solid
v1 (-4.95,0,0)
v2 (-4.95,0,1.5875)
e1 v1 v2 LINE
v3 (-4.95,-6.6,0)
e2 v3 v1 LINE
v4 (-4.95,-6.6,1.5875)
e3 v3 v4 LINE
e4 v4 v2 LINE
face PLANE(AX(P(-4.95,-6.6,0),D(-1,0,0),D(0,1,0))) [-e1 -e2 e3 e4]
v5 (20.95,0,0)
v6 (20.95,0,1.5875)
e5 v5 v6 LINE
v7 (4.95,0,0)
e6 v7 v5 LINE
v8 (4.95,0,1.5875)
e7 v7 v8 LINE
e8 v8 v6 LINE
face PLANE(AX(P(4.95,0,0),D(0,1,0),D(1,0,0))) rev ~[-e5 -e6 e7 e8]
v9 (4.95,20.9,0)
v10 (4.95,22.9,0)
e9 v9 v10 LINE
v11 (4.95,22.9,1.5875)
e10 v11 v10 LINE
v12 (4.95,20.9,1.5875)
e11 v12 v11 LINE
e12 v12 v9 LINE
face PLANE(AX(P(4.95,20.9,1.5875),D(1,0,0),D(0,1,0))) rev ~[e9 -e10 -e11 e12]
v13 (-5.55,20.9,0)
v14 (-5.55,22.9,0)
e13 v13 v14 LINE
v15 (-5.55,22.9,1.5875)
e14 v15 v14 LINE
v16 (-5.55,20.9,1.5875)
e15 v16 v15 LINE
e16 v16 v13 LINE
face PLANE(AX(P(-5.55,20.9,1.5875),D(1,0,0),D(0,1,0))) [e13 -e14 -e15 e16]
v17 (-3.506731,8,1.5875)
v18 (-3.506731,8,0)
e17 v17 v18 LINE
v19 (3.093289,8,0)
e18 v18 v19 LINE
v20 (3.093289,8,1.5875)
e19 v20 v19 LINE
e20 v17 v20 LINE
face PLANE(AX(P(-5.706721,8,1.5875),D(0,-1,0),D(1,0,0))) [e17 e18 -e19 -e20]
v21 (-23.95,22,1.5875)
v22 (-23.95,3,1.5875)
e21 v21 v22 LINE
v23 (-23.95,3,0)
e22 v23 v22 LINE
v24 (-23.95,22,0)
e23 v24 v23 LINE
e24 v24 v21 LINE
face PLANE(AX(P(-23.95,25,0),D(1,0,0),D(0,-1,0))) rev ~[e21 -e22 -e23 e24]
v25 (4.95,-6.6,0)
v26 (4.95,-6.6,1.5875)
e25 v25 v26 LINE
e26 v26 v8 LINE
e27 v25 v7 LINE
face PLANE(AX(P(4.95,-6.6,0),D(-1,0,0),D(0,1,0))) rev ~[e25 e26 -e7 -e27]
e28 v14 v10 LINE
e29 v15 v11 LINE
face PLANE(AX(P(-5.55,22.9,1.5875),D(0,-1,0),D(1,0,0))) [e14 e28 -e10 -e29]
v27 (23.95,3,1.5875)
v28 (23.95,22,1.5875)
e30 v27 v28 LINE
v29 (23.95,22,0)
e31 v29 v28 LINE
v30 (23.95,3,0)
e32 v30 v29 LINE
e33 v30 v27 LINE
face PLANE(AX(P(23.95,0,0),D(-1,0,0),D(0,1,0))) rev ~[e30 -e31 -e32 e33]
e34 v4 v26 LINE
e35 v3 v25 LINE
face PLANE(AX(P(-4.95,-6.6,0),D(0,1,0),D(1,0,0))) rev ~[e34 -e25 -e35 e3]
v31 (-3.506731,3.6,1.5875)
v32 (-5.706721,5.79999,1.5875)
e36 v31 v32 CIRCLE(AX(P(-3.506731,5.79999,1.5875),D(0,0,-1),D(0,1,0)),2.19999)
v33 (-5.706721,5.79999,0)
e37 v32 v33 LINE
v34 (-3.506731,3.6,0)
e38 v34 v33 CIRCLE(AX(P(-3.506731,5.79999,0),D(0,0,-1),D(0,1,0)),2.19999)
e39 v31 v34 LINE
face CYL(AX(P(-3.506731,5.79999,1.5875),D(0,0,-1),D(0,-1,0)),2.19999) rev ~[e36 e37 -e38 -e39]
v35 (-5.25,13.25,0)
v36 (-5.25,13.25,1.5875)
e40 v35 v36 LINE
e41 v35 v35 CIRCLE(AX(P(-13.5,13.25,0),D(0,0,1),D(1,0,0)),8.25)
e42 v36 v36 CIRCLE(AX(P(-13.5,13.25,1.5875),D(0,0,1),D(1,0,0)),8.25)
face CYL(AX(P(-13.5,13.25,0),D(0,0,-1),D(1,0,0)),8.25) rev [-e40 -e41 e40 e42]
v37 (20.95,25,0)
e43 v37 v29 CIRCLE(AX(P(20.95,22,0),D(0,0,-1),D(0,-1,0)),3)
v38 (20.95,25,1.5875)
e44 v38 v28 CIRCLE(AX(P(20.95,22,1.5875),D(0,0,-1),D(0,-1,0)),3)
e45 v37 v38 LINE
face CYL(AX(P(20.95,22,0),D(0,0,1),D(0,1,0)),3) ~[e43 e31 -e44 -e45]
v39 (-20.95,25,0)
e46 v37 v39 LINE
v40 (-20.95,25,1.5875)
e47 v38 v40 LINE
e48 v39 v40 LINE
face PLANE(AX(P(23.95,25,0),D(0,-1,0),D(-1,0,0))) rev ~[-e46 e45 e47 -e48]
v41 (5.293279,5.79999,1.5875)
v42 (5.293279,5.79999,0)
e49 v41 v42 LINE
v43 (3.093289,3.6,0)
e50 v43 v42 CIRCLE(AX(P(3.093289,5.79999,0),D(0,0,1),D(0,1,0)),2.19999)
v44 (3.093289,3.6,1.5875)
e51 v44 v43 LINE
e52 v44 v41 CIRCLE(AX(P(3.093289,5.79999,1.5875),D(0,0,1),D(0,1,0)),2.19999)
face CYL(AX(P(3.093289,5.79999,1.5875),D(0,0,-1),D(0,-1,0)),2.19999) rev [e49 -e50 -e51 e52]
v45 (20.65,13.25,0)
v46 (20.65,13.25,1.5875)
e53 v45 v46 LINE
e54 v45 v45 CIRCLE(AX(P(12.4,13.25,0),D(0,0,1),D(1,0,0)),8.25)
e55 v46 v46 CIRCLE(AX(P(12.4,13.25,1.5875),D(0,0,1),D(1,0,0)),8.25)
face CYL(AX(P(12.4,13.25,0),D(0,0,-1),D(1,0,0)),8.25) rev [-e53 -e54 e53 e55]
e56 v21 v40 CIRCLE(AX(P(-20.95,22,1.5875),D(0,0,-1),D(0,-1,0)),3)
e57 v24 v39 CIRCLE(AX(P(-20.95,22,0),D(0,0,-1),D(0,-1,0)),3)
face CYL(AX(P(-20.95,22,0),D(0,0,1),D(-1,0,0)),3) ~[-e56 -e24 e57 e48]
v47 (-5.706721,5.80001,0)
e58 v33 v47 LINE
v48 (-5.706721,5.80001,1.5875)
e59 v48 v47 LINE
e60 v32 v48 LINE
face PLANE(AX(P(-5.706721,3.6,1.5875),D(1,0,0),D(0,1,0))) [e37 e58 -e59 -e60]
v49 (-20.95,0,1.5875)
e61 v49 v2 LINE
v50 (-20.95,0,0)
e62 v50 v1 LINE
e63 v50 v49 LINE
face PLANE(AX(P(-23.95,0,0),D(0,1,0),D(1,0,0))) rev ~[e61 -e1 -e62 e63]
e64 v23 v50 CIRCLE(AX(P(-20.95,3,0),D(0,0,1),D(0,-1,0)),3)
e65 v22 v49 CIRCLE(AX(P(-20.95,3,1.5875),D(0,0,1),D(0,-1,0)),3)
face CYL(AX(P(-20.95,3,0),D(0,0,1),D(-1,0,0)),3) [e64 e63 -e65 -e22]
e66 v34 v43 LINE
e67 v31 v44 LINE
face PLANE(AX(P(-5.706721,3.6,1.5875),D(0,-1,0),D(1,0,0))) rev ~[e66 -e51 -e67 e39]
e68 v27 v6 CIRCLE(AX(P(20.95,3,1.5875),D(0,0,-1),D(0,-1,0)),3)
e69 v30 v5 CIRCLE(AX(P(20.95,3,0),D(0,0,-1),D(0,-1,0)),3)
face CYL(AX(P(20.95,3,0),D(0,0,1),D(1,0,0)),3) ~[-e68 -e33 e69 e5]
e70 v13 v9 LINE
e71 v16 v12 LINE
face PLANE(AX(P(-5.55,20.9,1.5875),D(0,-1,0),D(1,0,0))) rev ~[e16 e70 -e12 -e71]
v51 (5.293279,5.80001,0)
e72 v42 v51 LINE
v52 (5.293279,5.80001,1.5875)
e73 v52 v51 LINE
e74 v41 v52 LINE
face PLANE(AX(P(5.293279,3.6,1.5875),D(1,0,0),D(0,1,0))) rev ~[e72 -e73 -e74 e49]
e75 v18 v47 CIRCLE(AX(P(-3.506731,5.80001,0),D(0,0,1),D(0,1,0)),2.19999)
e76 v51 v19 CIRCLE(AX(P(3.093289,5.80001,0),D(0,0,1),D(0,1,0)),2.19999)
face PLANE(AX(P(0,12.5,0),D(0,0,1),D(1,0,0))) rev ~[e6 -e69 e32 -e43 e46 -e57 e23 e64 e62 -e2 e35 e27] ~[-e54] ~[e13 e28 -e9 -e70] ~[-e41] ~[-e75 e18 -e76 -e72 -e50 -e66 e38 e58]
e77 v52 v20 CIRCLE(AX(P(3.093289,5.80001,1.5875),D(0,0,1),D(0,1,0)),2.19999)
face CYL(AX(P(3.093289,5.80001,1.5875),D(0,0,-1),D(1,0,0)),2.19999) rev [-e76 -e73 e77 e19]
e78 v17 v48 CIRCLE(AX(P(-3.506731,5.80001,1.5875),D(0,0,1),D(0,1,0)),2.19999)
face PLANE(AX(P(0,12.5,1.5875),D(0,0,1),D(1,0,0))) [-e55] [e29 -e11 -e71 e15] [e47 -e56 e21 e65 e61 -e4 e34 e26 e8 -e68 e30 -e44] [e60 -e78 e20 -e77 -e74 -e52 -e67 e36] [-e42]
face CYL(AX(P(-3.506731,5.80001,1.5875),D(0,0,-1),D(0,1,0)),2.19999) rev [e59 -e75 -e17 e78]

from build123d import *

# Parameters (mm, degrees)
F2_R     = 8.25
F2_W     = 9.9
F2_H     = 6.6
F3_DEPTH = 1.5875
F4_W     = 11
F4_H     = 4.4
F4_W_2   = 10.5
F4_H_2   = 2
F5_DEPTH = 1.5885
F6_R     = 3
F7_R     = 2.19999


# Not quite as in the source:
# - a fillet or chamfer is up to 0.001 mm smaller than in the source, because OpenCascade refuses the exact size


with BuildPart() as f3:
    # F2 (on Top) → F3 (new body)
    with BuildSketch(Plane.XY):
        Polygon((-23.95, 25), (-23.95, 0), (-4.95, 0), (4.95, 0), (23.95, 0), (23.95, 25), align=None)
        with Locations((-13.5, 13.25)):
            Circle(F2_R, mode=Mode.SUBTRACT)
        with Locations((12.4, 13.25)):
            Circle(F2_R, mode=Mode.SUBTRACT)
        with Locations((0, -3.3)):
            Rectangle(F2_W, F2_H)
    extrude(amount=F3_DEPTH)

    # F4 (on face) → F5 (cut, through all)
    with BuildSketch(Plane.XY.offset(1.5875)):
        with Locations((-0.2067205198, 5.8)):
            Rectangle(F4_W, F4_H)
        with Locations((-0.3, 21.9)):
            Rectangle(F4_W_2, F4_H_2)
    extrude(amount=-F5_DEPTH, mode=Mode.SUBTRACT)

    # F6
    f6_edges = [f3.edges().sort_by_distance(p)[0] for p in [
        (-23.95, 0, 0.79375),
        (-23.95, 25, 0.79375),
        (23.95, 25, 0.79375),
        (23.95, 0, 0.79375),
    ]]
    fillet(f6_edges, radius=F6_R)

    # F7 (radius 2.2 in the source; OpenCascade refuses exactly that, so slightly less here)
    f7_edges = [f3.edges().sort_by_distance(p)[0] for p in [
        (-5.706721, 3.6, 0.79375),
        (-5.706721, 8, 0.79375),
        (5.293279, 3.6, 0.79375),
        (5.293279, 8, 0.79375),
    ]]
    fillet(f7_edges, radius=F7_R)


solid = f3.part
